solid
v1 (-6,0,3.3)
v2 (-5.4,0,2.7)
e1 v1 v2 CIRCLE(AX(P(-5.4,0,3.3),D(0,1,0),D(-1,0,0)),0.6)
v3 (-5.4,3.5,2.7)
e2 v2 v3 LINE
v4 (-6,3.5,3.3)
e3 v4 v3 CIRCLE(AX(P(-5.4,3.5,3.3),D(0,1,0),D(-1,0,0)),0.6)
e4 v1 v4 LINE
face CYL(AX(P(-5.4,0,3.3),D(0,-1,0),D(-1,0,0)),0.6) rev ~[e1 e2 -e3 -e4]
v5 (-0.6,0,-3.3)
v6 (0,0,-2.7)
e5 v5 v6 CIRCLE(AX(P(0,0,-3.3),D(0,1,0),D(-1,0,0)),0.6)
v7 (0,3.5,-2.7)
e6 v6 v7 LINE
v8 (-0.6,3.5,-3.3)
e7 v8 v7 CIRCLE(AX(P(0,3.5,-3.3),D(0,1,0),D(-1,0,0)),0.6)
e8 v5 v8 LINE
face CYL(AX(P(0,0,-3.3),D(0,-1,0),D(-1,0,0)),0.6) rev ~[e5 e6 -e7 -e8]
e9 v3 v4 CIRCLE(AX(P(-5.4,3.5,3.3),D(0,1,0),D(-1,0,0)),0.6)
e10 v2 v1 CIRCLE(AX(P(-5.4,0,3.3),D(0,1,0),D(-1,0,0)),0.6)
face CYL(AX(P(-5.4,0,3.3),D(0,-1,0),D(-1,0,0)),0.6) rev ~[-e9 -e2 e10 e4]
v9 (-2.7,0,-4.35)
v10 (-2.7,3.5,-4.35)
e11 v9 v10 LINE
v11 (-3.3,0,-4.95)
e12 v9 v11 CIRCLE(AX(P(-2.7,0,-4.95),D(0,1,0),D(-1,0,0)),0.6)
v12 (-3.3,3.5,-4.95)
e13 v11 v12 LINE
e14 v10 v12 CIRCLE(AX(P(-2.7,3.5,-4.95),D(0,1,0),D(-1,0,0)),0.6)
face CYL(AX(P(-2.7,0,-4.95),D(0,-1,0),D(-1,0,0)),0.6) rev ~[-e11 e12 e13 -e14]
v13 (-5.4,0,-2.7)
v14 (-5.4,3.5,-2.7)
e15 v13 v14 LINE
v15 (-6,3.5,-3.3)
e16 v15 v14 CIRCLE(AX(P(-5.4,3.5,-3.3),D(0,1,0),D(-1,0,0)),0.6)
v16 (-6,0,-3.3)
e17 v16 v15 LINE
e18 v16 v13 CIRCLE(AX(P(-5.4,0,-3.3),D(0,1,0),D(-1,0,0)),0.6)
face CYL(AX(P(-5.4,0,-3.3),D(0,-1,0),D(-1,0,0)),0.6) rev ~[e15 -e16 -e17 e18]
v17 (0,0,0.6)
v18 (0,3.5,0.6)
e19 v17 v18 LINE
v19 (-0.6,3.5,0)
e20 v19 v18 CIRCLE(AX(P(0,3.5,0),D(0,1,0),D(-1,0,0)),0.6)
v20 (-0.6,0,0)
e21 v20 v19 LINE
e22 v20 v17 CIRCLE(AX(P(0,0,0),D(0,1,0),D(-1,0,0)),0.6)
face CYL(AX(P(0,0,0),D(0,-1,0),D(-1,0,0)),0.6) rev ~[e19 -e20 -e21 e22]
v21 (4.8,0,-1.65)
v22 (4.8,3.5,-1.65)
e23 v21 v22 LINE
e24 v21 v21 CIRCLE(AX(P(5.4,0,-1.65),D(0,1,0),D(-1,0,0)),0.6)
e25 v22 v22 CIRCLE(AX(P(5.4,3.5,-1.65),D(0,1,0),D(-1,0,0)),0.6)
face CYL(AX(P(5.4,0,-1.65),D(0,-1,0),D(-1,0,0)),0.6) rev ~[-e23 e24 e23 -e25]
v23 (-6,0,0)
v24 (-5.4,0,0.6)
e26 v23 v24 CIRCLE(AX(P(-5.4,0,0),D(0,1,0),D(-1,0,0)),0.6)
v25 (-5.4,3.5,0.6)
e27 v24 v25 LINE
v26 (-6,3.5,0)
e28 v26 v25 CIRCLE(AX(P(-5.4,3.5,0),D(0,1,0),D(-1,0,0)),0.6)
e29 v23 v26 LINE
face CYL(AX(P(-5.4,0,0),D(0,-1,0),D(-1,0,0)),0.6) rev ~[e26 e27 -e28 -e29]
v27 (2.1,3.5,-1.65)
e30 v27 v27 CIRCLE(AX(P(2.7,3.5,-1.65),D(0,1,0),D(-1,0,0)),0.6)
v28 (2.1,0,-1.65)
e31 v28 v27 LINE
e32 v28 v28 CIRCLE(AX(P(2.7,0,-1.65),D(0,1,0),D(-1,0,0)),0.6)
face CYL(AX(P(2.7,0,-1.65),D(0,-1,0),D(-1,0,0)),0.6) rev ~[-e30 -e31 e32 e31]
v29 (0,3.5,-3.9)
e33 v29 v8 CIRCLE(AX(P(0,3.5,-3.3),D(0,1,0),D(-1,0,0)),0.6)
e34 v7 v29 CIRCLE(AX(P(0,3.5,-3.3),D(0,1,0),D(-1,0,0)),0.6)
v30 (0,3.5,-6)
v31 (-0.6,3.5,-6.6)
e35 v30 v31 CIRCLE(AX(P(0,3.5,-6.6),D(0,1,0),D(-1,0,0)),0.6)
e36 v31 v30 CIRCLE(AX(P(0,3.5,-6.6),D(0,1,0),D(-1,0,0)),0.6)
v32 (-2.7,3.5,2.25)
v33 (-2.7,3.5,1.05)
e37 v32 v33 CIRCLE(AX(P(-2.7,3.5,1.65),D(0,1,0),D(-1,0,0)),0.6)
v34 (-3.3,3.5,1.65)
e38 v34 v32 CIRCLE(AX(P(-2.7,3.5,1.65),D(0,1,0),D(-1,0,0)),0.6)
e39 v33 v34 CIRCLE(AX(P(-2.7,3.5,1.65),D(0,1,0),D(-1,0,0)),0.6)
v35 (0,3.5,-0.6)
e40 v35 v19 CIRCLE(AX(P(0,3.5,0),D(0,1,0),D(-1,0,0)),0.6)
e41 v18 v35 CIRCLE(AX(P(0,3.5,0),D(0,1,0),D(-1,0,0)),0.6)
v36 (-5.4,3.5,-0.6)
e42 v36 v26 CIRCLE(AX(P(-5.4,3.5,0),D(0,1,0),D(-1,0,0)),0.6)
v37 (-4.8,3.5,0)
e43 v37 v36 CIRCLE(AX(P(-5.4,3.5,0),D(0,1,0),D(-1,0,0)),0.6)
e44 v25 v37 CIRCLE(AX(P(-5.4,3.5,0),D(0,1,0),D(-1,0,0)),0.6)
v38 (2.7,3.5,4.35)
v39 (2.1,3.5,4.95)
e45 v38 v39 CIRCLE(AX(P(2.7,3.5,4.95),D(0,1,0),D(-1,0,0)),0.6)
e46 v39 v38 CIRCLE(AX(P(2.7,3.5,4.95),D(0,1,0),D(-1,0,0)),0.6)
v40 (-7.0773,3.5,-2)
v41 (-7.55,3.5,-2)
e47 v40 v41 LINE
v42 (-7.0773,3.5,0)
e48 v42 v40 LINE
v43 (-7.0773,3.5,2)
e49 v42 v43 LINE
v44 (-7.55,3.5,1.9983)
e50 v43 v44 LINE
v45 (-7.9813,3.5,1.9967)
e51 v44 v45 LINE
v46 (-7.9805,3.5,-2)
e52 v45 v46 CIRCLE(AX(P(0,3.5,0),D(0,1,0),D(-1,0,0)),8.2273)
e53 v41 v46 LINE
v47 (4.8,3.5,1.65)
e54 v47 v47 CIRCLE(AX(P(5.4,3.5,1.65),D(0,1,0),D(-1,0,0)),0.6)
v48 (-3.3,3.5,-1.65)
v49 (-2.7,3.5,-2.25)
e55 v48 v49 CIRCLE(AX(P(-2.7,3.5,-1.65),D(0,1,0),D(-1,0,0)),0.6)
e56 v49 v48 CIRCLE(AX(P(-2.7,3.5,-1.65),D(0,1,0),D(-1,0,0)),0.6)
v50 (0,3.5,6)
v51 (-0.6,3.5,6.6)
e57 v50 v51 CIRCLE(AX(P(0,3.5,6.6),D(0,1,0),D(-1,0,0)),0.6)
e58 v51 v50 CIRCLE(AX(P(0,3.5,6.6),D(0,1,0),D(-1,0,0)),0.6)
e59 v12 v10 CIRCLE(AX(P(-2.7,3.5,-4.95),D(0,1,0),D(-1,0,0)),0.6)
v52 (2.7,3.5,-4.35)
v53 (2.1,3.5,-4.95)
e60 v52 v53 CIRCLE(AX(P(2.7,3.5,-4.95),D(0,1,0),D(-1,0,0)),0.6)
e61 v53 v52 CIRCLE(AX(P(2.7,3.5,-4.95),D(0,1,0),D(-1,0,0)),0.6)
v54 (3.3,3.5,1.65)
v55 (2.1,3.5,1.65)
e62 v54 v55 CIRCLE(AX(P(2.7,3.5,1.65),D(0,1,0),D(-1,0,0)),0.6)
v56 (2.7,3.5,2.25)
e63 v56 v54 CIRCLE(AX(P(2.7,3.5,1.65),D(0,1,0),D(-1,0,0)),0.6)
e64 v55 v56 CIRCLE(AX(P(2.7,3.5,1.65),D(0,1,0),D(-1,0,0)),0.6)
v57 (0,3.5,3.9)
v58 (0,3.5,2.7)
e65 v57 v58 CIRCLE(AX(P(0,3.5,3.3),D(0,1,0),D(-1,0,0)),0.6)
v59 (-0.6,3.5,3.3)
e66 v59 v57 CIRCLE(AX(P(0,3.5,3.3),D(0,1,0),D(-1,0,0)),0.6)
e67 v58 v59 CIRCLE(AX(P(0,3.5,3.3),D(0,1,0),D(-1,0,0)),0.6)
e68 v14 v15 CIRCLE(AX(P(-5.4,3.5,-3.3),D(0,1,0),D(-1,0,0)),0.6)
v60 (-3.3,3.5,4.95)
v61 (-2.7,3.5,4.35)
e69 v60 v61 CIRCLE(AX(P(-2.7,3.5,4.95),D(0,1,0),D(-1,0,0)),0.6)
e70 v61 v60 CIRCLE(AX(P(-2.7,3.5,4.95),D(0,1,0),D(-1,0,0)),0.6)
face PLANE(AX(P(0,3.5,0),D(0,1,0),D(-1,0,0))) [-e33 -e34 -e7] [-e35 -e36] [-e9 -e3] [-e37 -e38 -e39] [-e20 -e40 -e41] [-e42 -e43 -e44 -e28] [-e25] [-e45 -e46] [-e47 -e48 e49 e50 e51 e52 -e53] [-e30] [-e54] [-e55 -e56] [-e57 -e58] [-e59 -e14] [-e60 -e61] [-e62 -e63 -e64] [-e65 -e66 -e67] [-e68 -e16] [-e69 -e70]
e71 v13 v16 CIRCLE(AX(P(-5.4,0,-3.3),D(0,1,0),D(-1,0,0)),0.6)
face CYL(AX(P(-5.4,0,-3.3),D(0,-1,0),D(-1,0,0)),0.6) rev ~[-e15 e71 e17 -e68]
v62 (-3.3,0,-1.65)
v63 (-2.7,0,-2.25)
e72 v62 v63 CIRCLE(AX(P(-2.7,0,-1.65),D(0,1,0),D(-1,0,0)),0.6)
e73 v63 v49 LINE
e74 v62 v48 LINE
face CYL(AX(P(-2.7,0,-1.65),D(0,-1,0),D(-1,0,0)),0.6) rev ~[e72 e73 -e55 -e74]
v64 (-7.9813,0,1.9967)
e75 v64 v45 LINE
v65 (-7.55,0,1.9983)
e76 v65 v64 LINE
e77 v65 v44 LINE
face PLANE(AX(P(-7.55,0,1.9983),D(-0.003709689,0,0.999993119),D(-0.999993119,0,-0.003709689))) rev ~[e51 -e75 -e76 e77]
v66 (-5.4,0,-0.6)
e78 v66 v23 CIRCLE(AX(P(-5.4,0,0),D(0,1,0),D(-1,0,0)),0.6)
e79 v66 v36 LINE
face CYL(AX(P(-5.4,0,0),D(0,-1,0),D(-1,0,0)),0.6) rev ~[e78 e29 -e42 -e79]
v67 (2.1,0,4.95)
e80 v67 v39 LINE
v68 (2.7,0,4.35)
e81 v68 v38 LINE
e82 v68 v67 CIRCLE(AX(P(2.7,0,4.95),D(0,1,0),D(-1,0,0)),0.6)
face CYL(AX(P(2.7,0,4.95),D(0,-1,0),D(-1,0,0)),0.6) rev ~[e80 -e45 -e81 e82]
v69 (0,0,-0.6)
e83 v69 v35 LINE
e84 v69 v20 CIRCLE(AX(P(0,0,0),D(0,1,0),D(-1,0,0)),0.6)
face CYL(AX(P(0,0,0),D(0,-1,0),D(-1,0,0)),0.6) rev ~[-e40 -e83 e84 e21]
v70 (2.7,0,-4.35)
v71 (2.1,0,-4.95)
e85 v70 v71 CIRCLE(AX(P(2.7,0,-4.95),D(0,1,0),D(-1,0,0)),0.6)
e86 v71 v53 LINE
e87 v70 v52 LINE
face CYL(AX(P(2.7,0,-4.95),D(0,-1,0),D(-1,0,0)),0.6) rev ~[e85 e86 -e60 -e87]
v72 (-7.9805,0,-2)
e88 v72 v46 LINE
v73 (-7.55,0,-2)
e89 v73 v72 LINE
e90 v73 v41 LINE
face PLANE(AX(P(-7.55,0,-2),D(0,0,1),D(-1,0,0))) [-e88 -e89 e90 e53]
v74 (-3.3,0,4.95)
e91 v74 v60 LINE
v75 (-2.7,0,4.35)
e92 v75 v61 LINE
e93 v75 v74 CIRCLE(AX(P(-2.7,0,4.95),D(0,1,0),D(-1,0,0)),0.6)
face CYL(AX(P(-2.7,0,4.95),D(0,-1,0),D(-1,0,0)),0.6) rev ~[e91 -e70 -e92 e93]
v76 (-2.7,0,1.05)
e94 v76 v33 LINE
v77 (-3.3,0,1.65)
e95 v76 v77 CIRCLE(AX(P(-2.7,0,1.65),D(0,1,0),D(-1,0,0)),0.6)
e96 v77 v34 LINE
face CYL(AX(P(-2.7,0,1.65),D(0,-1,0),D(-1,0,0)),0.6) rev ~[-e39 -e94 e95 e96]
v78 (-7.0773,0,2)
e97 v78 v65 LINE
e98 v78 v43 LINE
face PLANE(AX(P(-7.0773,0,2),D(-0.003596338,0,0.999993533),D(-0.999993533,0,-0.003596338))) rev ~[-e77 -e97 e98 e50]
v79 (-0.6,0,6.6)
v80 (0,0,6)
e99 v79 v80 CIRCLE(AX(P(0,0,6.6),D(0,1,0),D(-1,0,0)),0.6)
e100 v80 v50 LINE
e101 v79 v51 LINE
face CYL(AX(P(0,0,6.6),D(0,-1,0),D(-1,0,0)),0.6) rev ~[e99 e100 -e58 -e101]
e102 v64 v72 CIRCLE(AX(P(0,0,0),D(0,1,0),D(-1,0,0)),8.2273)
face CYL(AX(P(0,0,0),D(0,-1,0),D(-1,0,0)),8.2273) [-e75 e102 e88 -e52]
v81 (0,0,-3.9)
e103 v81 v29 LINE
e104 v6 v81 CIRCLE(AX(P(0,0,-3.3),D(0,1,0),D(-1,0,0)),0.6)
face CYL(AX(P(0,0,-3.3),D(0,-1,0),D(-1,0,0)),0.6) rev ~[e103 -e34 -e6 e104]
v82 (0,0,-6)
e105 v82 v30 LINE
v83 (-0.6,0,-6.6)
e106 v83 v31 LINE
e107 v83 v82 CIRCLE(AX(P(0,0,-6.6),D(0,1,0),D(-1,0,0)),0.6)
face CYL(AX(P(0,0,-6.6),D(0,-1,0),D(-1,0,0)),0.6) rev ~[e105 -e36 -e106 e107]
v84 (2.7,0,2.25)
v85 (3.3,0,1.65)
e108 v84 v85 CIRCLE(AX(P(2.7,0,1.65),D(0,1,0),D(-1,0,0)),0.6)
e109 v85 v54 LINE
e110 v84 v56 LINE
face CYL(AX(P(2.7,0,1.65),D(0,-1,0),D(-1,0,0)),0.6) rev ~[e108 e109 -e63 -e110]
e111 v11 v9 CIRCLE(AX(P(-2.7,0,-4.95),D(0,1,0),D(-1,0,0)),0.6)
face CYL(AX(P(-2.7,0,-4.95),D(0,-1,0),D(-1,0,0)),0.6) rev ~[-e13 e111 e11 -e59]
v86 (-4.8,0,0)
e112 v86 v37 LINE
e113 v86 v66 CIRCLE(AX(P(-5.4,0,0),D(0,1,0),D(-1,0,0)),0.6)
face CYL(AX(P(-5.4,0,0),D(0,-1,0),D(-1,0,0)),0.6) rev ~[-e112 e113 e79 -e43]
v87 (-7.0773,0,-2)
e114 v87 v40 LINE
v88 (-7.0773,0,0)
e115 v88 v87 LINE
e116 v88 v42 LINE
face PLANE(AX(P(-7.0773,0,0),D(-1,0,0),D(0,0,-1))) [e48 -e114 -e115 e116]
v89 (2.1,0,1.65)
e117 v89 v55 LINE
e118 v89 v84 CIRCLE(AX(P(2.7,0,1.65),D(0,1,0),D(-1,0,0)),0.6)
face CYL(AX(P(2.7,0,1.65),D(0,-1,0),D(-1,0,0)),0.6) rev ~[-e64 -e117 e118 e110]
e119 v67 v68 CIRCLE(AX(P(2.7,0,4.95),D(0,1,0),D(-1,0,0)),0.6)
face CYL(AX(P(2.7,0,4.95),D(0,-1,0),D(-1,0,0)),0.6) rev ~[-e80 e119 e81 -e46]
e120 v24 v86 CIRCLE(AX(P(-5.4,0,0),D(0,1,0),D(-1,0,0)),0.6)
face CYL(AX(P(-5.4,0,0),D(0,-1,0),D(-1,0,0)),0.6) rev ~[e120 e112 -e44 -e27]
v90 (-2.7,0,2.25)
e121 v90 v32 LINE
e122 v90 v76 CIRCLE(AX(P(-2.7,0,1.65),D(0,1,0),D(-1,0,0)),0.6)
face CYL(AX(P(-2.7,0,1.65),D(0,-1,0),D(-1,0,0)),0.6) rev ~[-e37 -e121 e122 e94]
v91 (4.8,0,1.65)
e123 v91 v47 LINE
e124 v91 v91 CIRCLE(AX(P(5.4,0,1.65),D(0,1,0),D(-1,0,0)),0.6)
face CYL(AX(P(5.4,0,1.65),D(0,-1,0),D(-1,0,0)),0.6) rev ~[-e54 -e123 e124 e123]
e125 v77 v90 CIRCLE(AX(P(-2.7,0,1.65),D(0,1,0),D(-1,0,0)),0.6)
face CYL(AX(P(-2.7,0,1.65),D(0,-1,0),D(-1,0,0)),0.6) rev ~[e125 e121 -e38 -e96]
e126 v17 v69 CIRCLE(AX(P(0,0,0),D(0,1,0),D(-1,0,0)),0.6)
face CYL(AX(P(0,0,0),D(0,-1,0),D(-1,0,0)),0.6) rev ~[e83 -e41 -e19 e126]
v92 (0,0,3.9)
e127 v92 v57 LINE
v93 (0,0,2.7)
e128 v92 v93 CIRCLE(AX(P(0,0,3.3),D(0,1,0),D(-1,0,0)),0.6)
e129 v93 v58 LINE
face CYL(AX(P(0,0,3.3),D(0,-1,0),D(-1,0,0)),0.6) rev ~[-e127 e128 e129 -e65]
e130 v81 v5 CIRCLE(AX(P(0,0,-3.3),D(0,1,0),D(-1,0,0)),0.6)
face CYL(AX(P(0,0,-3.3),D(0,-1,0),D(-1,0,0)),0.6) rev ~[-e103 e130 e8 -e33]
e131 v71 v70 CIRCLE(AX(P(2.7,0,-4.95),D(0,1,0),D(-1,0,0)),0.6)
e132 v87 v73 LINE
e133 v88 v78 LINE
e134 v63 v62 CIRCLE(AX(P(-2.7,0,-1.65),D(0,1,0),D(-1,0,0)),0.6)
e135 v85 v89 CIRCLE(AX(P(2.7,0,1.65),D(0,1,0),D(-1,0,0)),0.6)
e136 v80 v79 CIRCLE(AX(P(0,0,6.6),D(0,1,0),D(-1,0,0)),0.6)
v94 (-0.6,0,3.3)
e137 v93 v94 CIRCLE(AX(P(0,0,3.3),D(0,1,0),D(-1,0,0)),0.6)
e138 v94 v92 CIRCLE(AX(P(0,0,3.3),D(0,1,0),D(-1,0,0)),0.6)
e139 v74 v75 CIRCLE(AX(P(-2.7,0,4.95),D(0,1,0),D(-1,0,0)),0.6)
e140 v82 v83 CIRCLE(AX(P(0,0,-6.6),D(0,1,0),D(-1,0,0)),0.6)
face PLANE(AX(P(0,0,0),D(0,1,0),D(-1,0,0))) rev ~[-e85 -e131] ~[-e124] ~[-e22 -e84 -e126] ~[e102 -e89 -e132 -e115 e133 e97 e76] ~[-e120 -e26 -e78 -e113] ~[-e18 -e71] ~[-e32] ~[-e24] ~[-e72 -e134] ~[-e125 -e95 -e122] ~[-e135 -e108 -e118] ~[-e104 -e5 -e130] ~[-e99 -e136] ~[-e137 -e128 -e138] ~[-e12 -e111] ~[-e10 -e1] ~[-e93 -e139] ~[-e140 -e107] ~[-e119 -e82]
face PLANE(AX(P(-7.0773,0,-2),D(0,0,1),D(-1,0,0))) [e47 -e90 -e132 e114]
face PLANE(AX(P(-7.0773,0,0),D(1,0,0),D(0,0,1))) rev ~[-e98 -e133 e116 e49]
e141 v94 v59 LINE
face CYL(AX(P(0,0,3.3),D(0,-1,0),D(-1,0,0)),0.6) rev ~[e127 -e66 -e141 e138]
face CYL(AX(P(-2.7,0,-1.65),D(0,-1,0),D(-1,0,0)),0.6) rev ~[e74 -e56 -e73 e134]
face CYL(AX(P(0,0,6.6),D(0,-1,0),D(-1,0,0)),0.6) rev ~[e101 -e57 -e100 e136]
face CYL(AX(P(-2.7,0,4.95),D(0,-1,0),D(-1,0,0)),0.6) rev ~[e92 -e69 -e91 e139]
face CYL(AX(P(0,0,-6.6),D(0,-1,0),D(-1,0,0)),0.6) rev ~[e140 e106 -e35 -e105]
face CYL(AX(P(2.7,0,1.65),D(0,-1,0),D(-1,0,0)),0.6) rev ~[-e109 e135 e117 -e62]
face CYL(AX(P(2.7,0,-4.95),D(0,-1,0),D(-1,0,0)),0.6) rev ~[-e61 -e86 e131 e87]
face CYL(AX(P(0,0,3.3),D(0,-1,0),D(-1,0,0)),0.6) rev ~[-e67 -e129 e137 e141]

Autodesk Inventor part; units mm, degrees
ref_plane "YZ Plane" through (0, 0, 0) normal (1, 0, 0) x (0, 1, 0)
ref_plane "XZ Plane" through (0, 0, 0) normal (0, 1, 0) x (-1, 0, 0)
ref_plane "XY Plane" through (0, 0, 0) normal (0, 0, 1) x (1, 0, 0)
sketch "Sketch1" plane through (0, 0, 0) normal (0, 1, 0) x (-1, 0, 0)
  point P0 (0, 0)
sketch "Sketch3" plane through (0, 0, 0) normal (0, 1, 0) x (-1, 0, 0)
  circle A0 centre (0, 0) radius 8.2273
  line L0 (0, 0) -> (7.55, 0)
  line L1 (7.55, -2) -> (7.9805, -2)
  line L2 (7.55, 1.9983) -> (7.9813, 1.9967)
  circle A1 centre (-2.7, -1.65) radius 0.6
  line L3 (-2.7, -4.35) -> (-2.7, -4.95)
  circle A2 centre (-2.7, -4.95) radius 0.6
  line L4 (0, -0.6) -> (0, -1.65)
  line L5 (0, -0.6) -> (0, -1.65)
  circle A3 centre (0, 0) radius 0.6
  circle A4 centre (-5.4, -1.65) radius 0.6
  line L6 (-2.7, 1.65) -> (-5.4, 1.65)
  circle A5 centre (-5.4, 1.65) radius 0.6
  line L7 (0, 0.6) -> (0, 3.3)
  circle A6 centre (0, 3.3) radius 0.6
  circle A7 centre (-2.7, 1.65) radius 0.6
  line L8 (-2.7, 1.65) -> (-2.7, 4.95)
  circle A8 centre (-2.7, 4.95) radius 0.6
  line L9 (0, 3.9) -> (0, 6.6)
  circle A9 centre (0, 6.6) radius 0.6
  circle A10 centre (5.4, 0) radius 0.6
  line L10 (2.7, 1.05) -> (2.7, 1.65)
  circle A11 centre (2.7, 1.65) radius 0.6
  line L11 (5.4, 0) -> (5.4, 3.3)
  circle A12 centre (5.4, 3.3) radius 0.6
  line L12 (2.7, 2.25) -> (2.7, 4.95)
  circle A13 centre (2.7, 4.95) radius 0.6
  line L13 (0, -2.7) -> (0, -3.3)
  circle A14 centre (0, -3.3) radius 0.6
  line L14 (0, -3.9) -> (0, -6)
  line L15 (0, -6) -> (0, -6.6)
  circle A15 centre (0, -6.6) radius 0.6
  line L16 (2.7, 0) -> (5.4, 0)
  circle A16 centre (2.7, -1.65) radius 0.6
  line L17 (5.4, 0) -> (5.4, -3.3)
  circle A17 centre (5.4, -3.3) radius 0.6
  line L18 (2.7, -3.75) -> (2.7, -4.95)
  circle A18 centre (2.7, -4.95) radius 0.6
  line L19 (2.7, -1.65) -> (2.7, -3.75)
  line L20 (8.2273, 0.0003) -> (7.0773, 0)
  line L21 (7.0773, 0) -> (7.0773, 2)
  line L22 (7.0773, 2) -> (7.55, 1.9983)
  line L23 (7.0773, 0) -> (7.0773, -2)
  line L24 (7.0773, -2) -> (7.55, -2)
  dimension "d10" = 1.2
  dimension "d15" = 1.2
  dimension "d26" = 1.2
  dimension "d3" = 2
  dimension "d7" = 1.2
  dimension "d8" = 2.1
  dimension "d9" = 0.6
  dimension "d11" = 2.1
  dimension "d12" = 0.6
  dimension "d13" = 1.2
  dimension "d14" = 2.7
  dimension "d16" = 2.7
  dimension "d17" = 1.2
  dimension "d18" = 1.05
  dimension "d20" = 1.2
  dimension "d21" = 2.1
  dimension "d22" = 1.2
  dimension "d23" = 1.2
  dimension "d25" = 0.6
  dimension "d27" = 2.7
  dimension "d28" = 1.2
  dimension "d29" = 2.7
  dimension "d30" = 1.2
  dimension "d31" = 1.2
  dimension "d32" = 1.2
  dimension "d34" = 1.2
  dimension "d35" = 2.7
  dimension "d36" = 0.6
  dimension "d37" = 1.2
  dimension "d38" = 1.2
  dimension "d39" = 1.2
  dimension "d42" = 2.7
  dimension "d46" = 1.15
  dimension "d47" = 2
  dimension "d48" = 2
extrude "Extrusion1" add sketch "Sketch3" along normal blind 3.5 contours L2 L22 L21 L23 L24 L1 A0
properties part number "male"
